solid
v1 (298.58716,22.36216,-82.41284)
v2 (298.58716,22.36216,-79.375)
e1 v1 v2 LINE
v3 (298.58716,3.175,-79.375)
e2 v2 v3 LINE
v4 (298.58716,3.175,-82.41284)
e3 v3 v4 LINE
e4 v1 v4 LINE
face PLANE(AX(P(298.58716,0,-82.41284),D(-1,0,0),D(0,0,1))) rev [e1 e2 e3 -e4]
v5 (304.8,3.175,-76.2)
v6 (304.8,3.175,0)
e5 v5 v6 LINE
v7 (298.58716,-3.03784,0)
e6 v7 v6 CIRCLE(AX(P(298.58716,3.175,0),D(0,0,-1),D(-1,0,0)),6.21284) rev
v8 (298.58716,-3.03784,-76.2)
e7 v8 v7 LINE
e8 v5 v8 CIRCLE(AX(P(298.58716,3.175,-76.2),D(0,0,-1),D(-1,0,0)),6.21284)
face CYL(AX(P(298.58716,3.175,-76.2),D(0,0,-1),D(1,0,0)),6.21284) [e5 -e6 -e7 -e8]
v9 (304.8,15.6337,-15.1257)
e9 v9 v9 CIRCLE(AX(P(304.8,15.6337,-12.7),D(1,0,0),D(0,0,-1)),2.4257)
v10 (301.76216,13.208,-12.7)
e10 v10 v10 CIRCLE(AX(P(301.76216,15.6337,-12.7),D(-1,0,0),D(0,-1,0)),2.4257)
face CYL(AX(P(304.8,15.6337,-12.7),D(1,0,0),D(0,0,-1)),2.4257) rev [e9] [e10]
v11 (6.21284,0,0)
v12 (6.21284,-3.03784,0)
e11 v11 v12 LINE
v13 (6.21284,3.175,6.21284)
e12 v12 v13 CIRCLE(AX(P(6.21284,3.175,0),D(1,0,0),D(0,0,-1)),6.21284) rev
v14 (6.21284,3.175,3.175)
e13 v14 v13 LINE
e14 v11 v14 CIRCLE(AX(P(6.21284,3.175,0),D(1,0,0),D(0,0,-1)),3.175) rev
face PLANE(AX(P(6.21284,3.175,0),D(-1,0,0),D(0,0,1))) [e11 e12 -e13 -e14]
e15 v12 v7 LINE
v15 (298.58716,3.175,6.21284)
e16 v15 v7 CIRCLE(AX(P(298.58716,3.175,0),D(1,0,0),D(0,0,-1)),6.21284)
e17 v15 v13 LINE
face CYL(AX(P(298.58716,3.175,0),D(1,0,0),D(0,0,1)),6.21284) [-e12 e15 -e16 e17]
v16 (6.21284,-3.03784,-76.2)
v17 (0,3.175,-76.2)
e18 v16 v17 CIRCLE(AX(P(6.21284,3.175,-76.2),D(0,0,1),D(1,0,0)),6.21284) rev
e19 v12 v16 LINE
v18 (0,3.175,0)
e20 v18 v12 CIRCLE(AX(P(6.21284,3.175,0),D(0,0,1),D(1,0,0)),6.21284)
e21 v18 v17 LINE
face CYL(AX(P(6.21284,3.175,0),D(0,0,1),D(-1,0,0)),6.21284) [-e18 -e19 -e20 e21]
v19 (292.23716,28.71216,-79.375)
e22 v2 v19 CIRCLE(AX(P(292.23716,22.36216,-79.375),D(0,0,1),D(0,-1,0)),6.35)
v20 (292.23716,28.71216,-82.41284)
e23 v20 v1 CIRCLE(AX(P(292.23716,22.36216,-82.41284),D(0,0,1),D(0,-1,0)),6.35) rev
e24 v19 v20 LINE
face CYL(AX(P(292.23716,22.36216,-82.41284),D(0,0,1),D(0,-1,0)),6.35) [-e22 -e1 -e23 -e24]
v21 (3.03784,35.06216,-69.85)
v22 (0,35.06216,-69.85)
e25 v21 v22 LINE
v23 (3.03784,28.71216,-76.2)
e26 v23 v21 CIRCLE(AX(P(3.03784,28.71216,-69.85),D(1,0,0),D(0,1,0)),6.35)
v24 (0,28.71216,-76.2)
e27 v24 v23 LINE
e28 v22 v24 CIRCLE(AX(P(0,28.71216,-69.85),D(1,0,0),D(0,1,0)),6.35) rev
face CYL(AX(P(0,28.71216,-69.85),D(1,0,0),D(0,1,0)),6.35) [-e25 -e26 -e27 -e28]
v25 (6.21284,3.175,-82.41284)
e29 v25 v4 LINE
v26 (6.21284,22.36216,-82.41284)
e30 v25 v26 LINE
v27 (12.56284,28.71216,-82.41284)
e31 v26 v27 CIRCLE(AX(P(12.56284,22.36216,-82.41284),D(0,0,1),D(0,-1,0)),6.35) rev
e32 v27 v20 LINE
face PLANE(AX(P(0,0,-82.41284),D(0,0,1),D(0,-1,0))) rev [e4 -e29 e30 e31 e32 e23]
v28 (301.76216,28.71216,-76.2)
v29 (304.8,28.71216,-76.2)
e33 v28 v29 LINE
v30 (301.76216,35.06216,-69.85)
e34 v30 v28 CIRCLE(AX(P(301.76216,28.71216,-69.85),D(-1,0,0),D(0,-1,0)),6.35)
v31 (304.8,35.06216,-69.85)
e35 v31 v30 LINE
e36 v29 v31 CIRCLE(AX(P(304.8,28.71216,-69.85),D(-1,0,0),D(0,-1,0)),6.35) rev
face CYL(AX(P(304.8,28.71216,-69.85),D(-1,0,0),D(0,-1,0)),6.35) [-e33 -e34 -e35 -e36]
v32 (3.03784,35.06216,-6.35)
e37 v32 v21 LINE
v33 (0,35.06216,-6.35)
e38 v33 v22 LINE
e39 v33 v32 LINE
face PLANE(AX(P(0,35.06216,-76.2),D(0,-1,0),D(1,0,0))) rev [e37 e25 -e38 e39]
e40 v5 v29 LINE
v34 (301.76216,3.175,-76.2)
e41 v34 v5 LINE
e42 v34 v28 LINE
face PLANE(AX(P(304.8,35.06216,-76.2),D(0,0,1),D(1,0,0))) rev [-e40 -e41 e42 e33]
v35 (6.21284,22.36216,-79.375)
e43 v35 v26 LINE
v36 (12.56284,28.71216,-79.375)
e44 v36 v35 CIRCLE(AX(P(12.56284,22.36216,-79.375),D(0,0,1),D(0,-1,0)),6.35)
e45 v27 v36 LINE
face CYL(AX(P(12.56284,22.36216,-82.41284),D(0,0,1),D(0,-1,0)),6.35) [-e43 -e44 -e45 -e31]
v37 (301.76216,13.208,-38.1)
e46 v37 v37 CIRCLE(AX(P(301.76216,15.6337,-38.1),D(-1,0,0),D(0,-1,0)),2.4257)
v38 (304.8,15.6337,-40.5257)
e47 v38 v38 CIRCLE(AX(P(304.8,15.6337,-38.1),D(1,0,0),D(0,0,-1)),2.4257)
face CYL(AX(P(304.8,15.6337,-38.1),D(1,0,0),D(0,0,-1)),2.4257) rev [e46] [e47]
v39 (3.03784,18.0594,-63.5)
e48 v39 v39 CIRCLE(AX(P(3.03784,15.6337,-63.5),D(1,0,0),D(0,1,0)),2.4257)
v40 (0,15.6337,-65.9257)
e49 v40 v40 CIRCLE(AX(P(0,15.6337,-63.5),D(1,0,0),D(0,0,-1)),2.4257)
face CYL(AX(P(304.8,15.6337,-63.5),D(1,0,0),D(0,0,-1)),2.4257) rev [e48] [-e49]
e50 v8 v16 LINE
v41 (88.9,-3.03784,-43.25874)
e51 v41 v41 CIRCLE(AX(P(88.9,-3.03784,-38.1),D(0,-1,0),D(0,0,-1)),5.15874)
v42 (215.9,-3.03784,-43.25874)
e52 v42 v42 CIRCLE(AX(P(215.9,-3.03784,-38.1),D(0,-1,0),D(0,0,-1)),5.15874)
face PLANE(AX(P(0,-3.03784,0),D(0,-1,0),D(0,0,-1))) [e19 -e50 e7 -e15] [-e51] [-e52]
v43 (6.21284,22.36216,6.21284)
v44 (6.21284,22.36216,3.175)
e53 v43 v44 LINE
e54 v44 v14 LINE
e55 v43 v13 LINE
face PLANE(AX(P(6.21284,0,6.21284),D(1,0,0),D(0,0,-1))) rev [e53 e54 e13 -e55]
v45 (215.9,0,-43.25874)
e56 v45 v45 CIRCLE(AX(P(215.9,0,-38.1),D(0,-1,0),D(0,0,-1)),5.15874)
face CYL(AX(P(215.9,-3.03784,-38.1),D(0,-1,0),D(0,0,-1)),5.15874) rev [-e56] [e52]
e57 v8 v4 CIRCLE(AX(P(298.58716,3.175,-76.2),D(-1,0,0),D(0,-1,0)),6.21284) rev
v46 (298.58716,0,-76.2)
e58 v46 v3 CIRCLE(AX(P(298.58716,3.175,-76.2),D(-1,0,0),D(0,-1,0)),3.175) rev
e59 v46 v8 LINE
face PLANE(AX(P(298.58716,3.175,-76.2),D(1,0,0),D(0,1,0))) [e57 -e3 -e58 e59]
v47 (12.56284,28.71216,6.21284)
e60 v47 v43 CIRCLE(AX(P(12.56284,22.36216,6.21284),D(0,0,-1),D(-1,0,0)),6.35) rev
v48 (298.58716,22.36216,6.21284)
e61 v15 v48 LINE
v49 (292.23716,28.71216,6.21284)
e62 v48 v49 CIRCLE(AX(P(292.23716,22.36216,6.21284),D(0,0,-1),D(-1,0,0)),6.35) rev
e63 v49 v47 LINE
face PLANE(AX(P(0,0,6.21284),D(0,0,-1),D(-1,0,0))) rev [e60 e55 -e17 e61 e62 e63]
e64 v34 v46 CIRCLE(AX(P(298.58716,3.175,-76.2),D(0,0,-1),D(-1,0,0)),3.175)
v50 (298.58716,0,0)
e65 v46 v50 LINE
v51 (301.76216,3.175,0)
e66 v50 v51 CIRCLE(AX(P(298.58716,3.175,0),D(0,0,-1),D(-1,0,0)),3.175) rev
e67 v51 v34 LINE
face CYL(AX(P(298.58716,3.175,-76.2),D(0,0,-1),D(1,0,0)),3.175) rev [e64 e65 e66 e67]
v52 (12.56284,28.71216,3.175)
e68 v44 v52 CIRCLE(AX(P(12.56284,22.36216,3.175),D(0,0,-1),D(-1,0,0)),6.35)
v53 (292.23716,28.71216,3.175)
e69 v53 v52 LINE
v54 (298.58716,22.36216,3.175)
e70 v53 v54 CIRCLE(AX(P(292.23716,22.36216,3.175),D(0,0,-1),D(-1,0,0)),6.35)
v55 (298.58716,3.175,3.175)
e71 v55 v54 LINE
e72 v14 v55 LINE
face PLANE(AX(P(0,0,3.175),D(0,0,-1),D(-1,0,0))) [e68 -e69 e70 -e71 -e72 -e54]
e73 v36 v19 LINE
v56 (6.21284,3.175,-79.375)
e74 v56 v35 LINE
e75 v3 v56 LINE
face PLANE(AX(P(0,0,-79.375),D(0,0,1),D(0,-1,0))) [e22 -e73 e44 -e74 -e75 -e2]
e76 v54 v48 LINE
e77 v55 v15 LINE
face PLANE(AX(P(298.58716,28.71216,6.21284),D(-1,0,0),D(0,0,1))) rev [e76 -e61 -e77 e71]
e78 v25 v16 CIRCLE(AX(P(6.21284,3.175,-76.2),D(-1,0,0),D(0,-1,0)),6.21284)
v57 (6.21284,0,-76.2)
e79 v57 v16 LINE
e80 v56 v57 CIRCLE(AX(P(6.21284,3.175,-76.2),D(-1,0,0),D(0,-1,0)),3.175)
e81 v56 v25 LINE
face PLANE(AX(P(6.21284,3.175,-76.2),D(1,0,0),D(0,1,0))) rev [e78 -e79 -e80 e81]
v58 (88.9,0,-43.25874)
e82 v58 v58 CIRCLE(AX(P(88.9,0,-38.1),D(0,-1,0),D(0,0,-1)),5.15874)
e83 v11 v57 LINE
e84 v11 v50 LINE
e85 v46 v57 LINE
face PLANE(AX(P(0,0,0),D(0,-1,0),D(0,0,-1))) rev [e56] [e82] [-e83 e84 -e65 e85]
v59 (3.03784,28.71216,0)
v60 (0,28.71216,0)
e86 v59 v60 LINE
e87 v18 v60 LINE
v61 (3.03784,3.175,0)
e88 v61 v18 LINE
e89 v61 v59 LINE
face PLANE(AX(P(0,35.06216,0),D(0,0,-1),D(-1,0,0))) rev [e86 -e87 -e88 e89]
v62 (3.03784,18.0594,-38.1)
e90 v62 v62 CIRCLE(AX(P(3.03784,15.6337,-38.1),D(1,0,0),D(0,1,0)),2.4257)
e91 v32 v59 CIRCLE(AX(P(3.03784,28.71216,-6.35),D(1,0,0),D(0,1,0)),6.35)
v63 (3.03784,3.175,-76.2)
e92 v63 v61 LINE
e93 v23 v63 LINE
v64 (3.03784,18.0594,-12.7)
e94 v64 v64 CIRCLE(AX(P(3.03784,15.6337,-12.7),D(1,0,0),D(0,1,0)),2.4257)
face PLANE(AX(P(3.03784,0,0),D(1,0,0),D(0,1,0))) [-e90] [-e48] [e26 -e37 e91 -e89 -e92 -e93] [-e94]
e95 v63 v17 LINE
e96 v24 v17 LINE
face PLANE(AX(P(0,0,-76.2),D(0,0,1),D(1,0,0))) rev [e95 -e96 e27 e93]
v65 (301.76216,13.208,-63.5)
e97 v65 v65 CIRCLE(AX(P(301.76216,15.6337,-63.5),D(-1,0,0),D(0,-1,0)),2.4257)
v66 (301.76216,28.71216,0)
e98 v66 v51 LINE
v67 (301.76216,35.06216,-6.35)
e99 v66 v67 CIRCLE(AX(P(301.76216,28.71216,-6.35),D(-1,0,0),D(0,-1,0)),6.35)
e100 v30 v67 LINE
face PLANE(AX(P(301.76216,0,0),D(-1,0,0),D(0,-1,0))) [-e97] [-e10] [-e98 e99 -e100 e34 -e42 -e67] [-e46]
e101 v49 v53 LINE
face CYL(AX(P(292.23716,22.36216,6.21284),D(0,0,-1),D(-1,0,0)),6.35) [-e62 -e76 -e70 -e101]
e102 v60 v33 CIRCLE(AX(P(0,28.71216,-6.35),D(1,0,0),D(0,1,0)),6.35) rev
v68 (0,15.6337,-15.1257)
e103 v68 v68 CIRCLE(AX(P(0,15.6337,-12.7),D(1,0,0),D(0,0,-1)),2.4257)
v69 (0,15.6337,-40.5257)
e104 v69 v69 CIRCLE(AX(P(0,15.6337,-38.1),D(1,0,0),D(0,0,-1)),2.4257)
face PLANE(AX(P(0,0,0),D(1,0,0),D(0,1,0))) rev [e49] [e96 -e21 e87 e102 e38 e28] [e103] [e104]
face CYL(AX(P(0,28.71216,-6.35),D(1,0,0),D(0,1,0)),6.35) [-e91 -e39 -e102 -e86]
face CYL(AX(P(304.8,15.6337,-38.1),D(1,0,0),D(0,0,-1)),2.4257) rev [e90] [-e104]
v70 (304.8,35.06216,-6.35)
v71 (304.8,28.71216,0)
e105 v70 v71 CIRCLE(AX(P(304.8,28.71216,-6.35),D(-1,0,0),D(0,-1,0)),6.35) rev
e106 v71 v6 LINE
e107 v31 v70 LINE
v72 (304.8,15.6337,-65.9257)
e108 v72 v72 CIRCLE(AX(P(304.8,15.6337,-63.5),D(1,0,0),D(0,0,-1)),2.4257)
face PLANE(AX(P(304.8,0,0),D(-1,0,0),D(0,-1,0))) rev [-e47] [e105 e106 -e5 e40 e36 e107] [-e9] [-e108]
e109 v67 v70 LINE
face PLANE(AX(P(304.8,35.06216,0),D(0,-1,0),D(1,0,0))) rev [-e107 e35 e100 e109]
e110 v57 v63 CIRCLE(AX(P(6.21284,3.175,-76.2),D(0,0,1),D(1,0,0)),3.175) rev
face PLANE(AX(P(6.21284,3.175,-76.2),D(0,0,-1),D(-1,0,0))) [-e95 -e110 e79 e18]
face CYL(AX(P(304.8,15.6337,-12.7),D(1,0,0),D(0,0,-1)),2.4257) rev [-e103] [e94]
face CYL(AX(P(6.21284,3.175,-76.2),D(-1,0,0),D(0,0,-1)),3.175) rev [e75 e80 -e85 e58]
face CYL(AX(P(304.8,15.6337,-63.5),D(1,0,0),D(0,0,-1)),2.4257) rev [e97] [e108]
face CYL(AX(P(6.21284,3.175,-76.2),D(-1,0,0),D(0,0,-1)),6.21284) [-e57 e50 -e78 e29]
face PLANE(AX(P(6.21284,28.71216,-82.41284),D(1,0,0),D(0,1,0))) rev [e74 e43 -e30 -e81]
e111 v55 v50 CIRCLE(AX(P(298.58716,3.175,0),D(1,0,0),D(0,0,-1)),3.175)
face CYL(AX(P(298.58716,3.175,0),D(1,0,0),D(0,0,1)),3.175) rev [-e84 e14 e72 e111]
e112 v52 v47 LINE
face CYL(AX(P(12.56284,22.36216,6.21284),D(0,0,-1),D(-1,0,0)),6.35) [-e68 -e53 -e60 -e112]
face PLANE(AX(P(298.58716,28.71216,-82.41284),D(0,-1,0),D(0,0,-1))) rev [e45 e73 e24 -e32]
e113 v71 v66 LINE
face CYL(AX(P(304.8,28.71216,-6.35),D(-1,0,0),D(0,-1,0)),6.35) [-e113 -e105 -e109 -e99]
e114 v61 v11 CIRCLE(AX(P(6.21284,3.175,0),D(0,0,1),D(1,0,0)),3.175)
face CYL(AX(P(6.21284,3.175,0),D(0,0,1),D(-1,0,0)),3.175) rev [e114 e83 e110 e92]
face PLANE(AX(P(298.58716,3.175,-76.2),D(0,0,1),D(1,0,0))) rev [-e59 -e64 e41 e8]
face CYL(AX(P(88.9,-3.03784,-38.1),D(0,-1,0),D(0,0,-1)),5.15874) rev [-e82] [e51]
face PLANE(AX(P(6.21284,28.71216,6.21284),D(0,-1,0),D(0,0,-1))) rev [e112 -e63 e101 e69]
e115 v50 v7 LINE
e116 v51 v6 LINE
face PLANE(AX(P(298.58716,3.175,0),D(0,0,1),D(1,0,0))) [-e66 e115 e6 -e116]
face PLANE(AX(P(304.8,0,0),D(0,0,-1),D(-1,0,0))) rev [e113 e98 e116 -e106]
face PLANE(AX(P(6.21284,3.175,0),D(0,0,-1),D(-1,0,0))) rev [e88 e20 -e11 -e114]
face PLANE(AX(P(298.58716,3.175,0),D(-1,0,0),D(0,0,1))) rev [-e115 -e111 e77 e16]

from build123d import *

# Parameters (mm, degrees)
SKETCH1_W                      = 304.8
SKETCH1_H                      = 76.2
BASE_FLANGE1_DEPTH             = 3.03784
EDGE_FLANGE1_STRIP_W           = 18.50136
EDGE_FLANGE1_STRIP_H           = 3.03784
EDGE_FLANGE1_STRIP_CUT_DEPTH   = 76.2
EDGE_FLANGE1_STRIP_2_W         = 18.50136
EDGE_FLANGE1_STRIP_2_H         = 3.03784
EDGE_FLANGE1_STRIP_CUT_2_DEPTH = 76.2
EDGE_FLANGE1_DEPTH             = 76.2
EDGE_FLANGE1_BEND_DEPTH        = 76.2
EDGE_FLANGE2_DEPTH             = 292.37432
EDGE_FLANGE2_BEND_DEPTH        = 292.37432
F_3_8_CLEARANCE_HOLE1_D        = 10.31748
F_11_0_191_DIAMETER_HOLE1_D    = 4.8514
FILLET1_R                      = 6.35


# Sheet-metal steps are written as plain solids
with BuildPart() as part:
    # Sketch1 → Base-Flange1 (new body)
    with BuildSketch(Plane(origin=(0, 0, 0), x_dir=(1, 0, 0), z_dir=(0, 1, 0))):
        with Locations((152.4, 38.1)):
            Rectangle(SKETCH1_W, SKETCH1_H)
    extrude(amount=-BASE_FLANGE1_DEPTH)

    # Edge-Flange1 strip (across the edge) → Edge-Flange1 strip cut (cut)
    with BuildSketch(Plane.XY.offset(-76.2)):
        with Locations((-3.03784, -1.51892)):
            Rectangle(EDGE_FLANGE1_STRIP_W, EDGE_FLANGE1_STRIP_H)
    extrude(amount=EDGE_FLANGE1_STRIP_CUT_DEPTH, mode=Mode.SUBTRACT)

    # Edge-Flange1 strip 2 (across the edge) → Edge-Flange1 strip cut 2 (cut)
    with BuildSketch(Plane(origin=(304.8, 0, 0), x_dir=(-1, 0, 0), z_dir=(0, 0, -1))):
        with Locations((-3.03784, -1.51892)):
            Rectangle(EDGE_FLANGE1_STRIP_2_W, EDGE_FLANGE1_STRIP_2_H)
    extrude(amount=EDGE_FLANGE1_STRIP_CUT_2_DEPTH, mode=Mode.SUBTRACT)

    # Edge-Flange1 section (across the edge) → Edge-Flange1 (add)
    with BuildSketch(Plane.XY.offset(-76.2)):
        with BuildLine():
            Line((0, 3.175), (0, 35.06216))
            Line((0, 35.06216), (3.03784, 35.06216))
            Line((3.03784, 35.06216), (3.03784, 3.175))
            ThreePointArc((3.03784, 3.175), (3.96777597, 0.92993597), (6.21284, 0))
            Line((6.21284, 0), (6.21284, -3.03784))
            ThreePointArc((6.21284, -3.03784), (1.819698706, -1.218141294), (0, 3.175))
        make_face()
    extrude(amount=EDGE_FLANGE1_DEPTH)

    # Edge-Flange1 section 2 (across the edge) → Edge-Flange1 bend (add)
    with BuildSketch(Plane(origin=(304.8, 0, 0), x_dir=(-1, 0, 0), z_dir=(0, 0, -1))):
        with BuildLine():
            Line((0, 3.175), (0, 35.06216))
            Line((0, 35.06216), (3.03784, 35.06216))
            Line((3.03784, 35.06216), (3.03784, 3.175))
            ThreePointArc((3.03784, 3.175), (3.96777597, 0.92993597), (6.21284, 0))
            Line((6.21284, 0), (6.21284, -3.03784))
            ThreePointArc((6.21284, -3.03784), (1.819698706, -1.218141294), (0, 3.175))
        make_face()
    extrude(amount=EDGE_FLANGE1_BEND_DEPTH)

    # Edge-Flange2 section (across the edge) → Edge-Flange2 (add)
    with BuildSketch(Plane(origin=(6.21284, 0, 3.175), x_dir=(0, 0, -1), z_dir=(1, 0, 0))):
        with BuildLine():
            Line((-3.03784, 3.175), (-3.03784, 28.71216))
            Line((-3.03784, 28.71216), (0, 28.71216))
            Line((0, 28.71216), (0, 3.175))
            ThreePointArc((0, 3.175), (0.92993597, 0.92993597), (3.175, 0))
            Line((3.175, 0), (3.175, -3.03784))
            ThreePointArc((3.175, -3.03784), (-1.218141294, -1.218141294), (-3.03784, 3.175))
        make_face()
    extrude(amount=EDGE_FLANGE2_DEPTH)

    # Edge-Flange2 section 2 (across the edge) → Edge-Flange2 bend (add)
    with BuildSketch(Plane(origin=(298.58716, 0, -79.375), x_dir=(0, 0, 1), z_dir=(-1, 0, 0))):
        with BuildLine():
            Line((-3.03784, 3.175), (-3.03784, 28.71216))
            Line((-3.03784, 28.71216), (0, 28.71216))
            Line((0, 28.71216), (0, 3.175))
            ThreePointArc((0, 3.175), (0.92993597, 0.92993597), (3.175, 0))
            Line((3.175, 0), (3.175, -3.03784))
            ThreePointArc((3.175, -3.03784), (-1.218141294, -1.218141294), (-3.03784, 3.175))
        make_face()
    extrude(amount=EDGE_FLANGE2_BEND_DEPTH)

    # 3/8 Clearance Hole1 (through all)
    with Locations(Plane(origin=(0, -3.03784, 0), x_dir=(-1, 0, 0), z_dir=(0, -1, 0))):
        with Locations((-88.9, 38.1), (-215.9, 38.1)):
            Hole(F_3_8_CLEARANCE_HOLE1_D / 2)

    # #11 (0.191) Diameter Hole1 (through all)
    with Locations(Plane(origin=(304.8, 0, 0), x_dir=(0, 0, -1), z_dir=(1, 0, 0))):
        with Locations((12.7, 15.6337), (38.1, 15.6337), (63.5, 15.6337)):
            Hole(F_11_0_191_DIAMETER_HOLE1_D / 2)

    # Fillet1
    fillet1_edges = [part.edges().sort_by_distance(p)[0] for p in [
        (1.51892, 35.06216, 0),
        (6.21284, 28.71216, 4.69392),
        (1.51892, 35.06216, -76.2),
        (298.58716, 28.71216, 4.69392),
        (6.21284, 28.71216, -80.89392),
        (303.28108, 35.06216, 0),
        (298.58716, 28.71216, -80.89392),
        (303.28108, 35.06216, -76.2),
    ]]
    fillet(fillet1_edges, radius=FILLET1_R)


solid = part.part
